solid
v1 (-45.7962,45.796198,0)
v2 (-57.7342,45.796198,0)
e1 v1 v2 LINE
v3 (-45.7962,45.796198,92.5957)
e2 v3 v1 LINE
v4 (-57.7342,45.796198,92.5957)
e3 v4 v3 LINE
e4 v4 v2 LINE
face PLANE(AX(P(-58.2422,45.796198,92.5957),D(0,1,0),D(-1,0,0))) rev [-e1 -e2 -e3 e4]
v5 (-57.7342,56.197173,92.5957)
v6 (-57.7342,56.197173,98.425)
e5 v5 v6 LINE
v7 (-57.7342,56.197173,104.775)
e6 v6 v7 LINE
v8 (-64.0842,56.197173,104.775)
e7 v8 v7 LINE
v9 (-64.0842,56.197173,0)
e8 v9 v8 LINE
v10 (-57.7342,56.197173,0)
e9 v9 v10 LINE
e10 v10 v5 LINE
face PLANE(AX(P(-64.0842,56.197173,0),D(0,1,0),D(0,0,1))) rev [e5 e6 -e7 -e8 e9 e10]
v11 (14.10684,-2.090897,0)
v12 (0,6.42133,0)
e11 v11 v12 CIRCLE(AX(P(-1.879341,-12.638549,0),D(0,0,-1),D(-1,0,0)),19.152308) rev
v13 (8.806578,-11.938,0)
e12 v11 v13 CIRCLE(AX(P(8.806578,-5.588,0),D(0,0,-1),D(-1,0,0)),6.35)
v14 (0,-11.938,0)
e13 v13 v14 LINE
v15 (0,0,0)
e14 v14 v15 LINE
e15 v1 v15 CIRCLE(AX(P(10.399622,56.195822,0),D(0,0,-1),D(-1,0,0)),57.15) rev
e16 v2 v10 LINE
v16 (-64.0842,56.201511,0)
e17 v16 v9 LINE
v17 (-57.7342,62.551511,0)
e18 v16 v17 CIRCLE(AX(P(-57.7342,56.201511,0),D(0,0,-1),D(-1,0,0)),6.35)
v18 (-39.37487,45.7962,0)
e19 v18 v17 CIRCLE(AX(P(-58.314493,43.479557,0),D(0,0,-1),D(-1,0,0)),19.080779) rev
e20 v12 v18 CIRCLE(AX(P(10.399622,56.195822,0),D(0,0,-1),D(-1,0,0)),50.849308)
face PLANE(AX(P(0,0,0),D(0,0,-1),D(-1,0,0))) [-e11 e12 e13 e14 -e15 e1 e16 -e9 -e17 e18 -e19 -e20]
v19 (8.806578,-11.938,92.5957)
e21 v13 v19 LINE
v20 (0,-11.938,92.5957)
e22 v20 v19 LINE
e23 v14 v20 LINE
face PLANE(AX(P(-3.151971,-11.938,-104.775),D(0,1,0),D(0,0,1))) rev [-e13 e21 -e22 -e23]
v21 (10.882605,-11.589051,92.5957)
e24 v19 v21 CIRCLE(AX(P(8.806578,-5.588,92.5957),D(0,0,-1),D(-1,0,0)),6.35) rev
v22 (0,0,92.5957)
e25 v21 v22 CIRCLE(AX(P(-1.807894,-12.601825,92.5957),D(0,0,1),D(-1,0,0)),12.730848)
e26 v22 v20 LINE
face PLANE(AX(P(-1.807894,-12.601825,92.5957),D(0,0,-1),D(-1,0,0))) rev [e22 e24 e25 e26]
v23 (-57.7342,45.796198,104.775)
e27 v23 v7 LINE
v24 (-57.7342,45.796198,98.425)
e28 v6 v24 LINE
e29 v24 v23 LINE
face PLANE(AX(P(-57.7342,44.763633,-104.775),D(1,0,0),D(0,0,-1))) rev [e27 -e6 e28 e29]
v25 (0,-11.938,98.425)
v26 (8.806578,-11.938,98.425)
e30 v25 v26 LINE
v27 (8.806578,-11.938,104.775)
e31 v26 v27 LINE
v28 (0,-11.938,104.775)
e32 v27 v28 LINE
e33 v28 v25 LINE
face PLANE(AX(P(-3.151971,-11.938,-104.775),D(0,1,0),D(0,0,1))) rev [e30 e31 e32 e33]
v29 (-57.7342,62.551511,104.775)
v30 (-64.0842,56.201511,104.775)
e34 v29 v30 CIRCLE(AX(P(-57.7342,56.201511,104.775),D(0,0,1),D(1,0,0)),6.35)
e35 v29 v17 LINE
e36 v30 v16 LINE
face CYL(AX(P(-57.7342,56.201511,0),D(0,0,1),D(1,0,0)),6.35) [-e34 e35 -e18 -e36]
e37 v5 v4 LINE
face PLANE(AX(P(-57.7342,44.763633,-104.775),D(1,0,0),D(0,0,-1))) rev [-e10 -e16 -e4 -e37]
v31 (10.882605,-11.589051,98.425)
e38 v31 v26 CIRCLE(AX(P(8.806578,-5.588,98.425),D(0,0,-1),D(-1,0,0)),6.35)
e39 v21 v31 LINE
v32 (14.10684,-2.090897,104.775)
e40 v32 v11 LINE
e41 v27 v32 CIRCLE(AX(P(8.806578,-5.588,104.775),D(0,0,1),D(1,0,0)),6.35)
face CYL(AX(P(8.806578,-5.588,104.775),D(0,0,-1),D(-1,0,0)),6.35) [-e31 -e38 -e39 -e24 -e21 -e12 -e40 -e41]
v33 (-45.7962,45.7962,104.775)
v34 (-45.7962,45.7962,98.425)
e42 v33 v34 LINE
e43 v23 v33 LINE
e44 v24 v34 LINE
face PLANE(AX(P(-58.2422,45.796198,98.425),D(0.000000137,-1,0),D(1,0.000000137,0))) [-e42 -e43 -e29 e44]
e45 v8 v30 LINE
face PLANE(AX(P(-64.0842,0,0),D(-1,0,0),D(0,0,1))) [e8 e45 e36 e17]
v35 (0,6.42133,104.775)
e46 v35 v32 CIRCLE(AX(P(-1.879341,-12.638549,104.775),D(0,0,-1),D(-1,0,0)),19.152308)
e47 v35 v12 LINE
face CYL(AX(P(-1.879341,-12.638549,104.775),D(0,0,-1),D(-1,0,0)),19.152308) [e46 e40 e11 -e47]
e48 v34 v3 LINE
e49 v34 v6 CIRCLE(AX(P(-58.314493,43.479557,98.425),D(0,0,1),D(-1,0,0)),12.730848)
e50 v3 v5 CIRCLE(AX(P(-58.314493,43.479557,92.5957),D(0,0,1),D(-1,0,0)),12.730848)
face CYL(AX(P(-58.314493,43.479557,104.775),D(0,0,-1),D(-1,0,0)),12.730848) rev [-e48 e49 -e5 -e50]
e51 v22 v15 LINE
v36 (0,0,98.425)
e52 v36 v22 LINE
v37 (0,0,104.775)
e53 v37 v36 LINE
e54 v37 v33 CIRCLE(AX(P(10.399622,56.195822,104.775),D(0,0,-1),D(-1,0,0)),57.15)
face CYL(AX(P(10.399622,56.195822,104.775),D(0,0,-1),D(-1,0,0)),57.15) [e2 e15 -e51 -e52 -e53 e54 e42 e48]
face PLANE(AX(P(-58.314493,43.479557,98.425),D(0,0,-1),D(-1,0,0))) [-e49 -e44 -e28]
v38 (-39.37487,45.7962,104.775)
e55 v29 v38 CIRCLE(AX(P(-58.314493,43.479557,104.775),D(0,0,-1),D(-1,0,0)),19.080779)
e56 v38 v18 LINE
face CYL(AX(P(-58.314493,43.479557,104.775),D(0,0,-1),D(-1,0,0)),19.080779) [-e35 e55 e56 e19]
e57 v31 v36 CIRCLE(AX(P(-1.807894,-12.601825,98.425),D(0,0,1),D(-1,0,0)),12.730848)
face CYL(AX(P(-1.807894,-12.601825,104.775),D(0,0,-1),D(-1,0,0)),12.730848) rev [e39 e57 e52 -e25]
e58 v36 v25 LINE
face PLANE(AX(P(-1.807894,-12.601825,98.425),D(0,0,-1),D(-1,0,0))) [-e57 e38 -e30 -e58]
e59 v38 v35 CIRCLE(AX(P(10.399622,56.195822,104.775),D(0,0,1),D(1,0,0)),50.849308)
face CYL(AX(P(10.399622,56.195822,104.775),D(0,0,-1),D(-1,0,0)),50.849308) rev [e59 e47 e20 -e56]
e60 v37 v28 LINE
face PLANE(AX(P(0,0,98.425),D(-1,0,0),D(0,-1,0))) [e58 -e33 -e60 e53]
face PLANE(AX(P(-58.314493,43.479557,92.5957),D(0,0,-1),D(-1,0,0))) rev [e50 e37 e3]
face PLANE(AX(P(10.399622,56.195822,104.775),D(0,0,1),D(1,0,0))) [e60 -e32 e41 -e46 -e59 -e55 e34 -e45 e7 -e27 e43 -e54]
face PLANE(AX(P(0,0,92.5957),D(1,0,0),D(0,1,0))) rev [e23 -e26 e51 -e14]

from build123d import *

# Parameters (mm, degrees)
BOSS_EXTRUDE1_DEPTH = 104.775
BOSS_EXTRUDE2_DEPTH = 92.5957
BOSS_EXTRUDE3_START = -5.8293
BOSS_EXTRUDE3_DEPTH = 5.8293
BOSS_EXTRUDE4_DEPTH = 6.35
SKETCH5_W           = 7.787485422
SKETCH5_H           = 19.833751934
SKETCH5_W_2         = 22.754058967
SKETCH5_H_2         = 3.407024872
CUT_EXTRUDE1_DEPTH  = 227.312030137
SKETCH9_W           = 103.741840618
SKETCH9_H           = 106.576317138
CUT_EXTRUDE4_DEPTH  = 104.775
SKETCH10_W          = 104.775
SKETCH10_H          = 6.354337814
BOSS_EXTRUDE6_DEPTH = 6.35
FILLET2_R           = 6.35


with BuildPart() as part:
    # Sketch1 → Boss-Extrude1 (new, symmetric)
    with BuildSketch(Plane.XY):
        with BuildLine():
            Line((-58.2422, 56.2102), (-58.2422, 62.5602))
            ThreePointArc((-58.2422, 62.5602), (-45.640852469, 57.743322347), (-39.3748699, 45.7962))
            ThreePointArc((-39.3748699, 45.7962), (-25.556268964, 20.239931036), (0, 6.4213301))
            ThreePointArc((0, 6.4213301), (12.247457496, 0.293755183), (17.272, -12.446))
            Line((17.272, -12.446), (10.922, -12.446))
            ThreePointArc((10.922, -12.446), (7.760938146, -4.204686933), (0, 0))
            ThreePointArc((0, 0), (-30.011530905, 15.784669095), (-45.7962, 45.7962))
            ThreePointArc((-45.7962, 45.7962), (-50.144819563, 53.243313205), (-58.2422, 56.2102))
        make_face()
    extrude(amount=BOSS_EXTRUDE1_DEPTH, both=True)


with BuildPart() as boss_extrude2_tool:
    # Sketch2 → Boss-Extrude2 (new, symmetric)
    with BuildSketch(Plane.XY):
        with BuildLine():
            Line((-58.2422, 56.2102), (-58.2422, 45.796198296))
            Line((-58.2422, 45.796198296), (-45.796199685, 45.796198296))
            ThreePointArc((-45.796199685, 45.796198296), (-50.144818899, 53.243312648), (-58.2422, 56.2102))
        make_face()
        with BuildLine():
            Line((0, 0), (0, -12.446))
            Line((0, -12.446), (10.922, -12.446))
            ThreePointArc((10.922, -12.446), (7.760938146, -4.204686933), (0, 0))
        make_face()
    extrude(amount=BOSS_EXTRUDE2_DEPTH, both=True)


with BuildPart() as part_1:
    add(part.part)


with BuildPart() as part_2:
    # Boss-Extrude2: joined with boss_extrude2_tool
    add(part_1.part.fuse(boss_extrude2_tool.part, tol=0.00001))

    # Sketch3 → Boss-Extrude3 (add)
    with BuildSketch(Plane(origin=(0, 0, -104.775), x_dir=(-1, 0, 0), z_dir=(0, 0, -1)).offset(BOSS_EXTRUDE3_START)):
        with BuildLine():
            Line((58.2422, 56.2102), (58.2422, 45.796198296))
            Line((58.2422, 45.796198296), (45.7962, 45.7962))
            ThreePointArc((45.7962, 45.7962), (50.144819563, 53.243313205), (58.2422, 56.2102))
        make_face()
        with BuildLine():
            Line((0, 0), (0, -12.446))
            Line((0, -12.446), (-10.922, -12.446))
            ThreePointArc((-10.922, -12.446), (-7.760938146, -4.204686933), (0, 0))
        make_face()
    extrude(amount=BOSS_EXTRUDE3_DEPTH)

    # Sketch4 → Boss-Extrude4 (add)
    with BuildSketch(Plane.XY.offset(104.775)):
        with BuildLine():
            Line((-58.2422, 56.2102), (-58.2422, 45.796198296))
            Line((-58.2422, 45.796198296), (-45.7962, 45.7962))
            ThreePointArc((-45.7962, 45.7962), (-50.144819563, 53.243313205), (-58.2422, 56.2102))
        make_face()
        with BuildLine():
            Line((0, 0), (0, -12.446))
            Line((0, -12.446), (10.922, -12.446))
            ThreePointArc((10.922, -12.446), (7.760938146, -4.204686933), (0, 0))
        make_face()
    extrude(amount=-BOSS_EXTRUDE4_DEPTH)

    # Sketch5 → Cut-Extrude1 (cut, through all)
    with BuildSketch(Plane.XY.offset(104.775)):
        with Locations((-61.627942711, 54.680509116)):
            Rectangle(SKETCH5_W, SKETCH5_H)
        with Locations((8.225058429, -13.641512436)):
            Rectangle(SKETCH5_W_2, SKETCH5_H_2)
    extrude(amount=-CUT_EXTRUDE1_DEPTH, mode=Mode.SUBTRACT)

    # Sketch9 → Cut-Extrude4 (cut)
    with BuildSketch(Plane(origin=(0, 0, -104.775), x_dir=(-1, 0, 0), z_dir=(0, 0, -1))):
        with Locations((16.552204841, 26.535028587)):
            Rectangle(SKETCH9_W, SKETCH9_H)
    extrude(amount=-CUT_EXTRUDE4_DEPTH, mode=Mode.SUBTRACT)

    # Sketch10 → Boss-Extrude6 (add)
    with BuildSketch(Plane.ZY.offset(57.7342)):
        with Locations((52.3875, 59.374341949)):
            Rectangle(SKETCH10_W, SKETCH10_H)
    extrude(amount=BOSS_EXTRUDE6_DEPTH)

    # Fillet2
    # the kernel refuses this fillet: 6.35 mm, written as the material it takes off along each edge
    with BuildSketch(Plane(origin=(17.260151367, -11.938, -25.849178653), x_dir=(-0.30497213299383213, 0.9523612749882223, 0), z_dir=(0, 0, 1))) as fillet2_piece_1:
        with BuildLine():
            CenterArc((8.625598356, 6.114282737), FILLET2_R, 162.243512631, 123.416753829)
            Line((2.57810426, 8.050855782), (0, 0))
            ThreePointArc((0, 0), (5.169835731, -0.710949564), (10.339671461, 0))
        make_face()
    extrude(amount=156.473357306, mode=Mode.SUBTRACT)
    with BuildSketch(Plane(origin=(-64.0842, 62.551510856, -15.875), x_dir=(1, 0, 0), z_dir=(0, 0, 1))) as fillet2_piece_2:
        with BuildLine():
            CenterArc((FILLET2_R, -FILLET2_R), FILLET2_R, 90, 90)
            Line((0, -FILLET2_R), (0, 0))
            Line((0, 0), (FILLET2_R, 0))
        make_face()
    extrude(amount=136.525, mode=Mode.SUBTRACT)


solid = part_2.part
